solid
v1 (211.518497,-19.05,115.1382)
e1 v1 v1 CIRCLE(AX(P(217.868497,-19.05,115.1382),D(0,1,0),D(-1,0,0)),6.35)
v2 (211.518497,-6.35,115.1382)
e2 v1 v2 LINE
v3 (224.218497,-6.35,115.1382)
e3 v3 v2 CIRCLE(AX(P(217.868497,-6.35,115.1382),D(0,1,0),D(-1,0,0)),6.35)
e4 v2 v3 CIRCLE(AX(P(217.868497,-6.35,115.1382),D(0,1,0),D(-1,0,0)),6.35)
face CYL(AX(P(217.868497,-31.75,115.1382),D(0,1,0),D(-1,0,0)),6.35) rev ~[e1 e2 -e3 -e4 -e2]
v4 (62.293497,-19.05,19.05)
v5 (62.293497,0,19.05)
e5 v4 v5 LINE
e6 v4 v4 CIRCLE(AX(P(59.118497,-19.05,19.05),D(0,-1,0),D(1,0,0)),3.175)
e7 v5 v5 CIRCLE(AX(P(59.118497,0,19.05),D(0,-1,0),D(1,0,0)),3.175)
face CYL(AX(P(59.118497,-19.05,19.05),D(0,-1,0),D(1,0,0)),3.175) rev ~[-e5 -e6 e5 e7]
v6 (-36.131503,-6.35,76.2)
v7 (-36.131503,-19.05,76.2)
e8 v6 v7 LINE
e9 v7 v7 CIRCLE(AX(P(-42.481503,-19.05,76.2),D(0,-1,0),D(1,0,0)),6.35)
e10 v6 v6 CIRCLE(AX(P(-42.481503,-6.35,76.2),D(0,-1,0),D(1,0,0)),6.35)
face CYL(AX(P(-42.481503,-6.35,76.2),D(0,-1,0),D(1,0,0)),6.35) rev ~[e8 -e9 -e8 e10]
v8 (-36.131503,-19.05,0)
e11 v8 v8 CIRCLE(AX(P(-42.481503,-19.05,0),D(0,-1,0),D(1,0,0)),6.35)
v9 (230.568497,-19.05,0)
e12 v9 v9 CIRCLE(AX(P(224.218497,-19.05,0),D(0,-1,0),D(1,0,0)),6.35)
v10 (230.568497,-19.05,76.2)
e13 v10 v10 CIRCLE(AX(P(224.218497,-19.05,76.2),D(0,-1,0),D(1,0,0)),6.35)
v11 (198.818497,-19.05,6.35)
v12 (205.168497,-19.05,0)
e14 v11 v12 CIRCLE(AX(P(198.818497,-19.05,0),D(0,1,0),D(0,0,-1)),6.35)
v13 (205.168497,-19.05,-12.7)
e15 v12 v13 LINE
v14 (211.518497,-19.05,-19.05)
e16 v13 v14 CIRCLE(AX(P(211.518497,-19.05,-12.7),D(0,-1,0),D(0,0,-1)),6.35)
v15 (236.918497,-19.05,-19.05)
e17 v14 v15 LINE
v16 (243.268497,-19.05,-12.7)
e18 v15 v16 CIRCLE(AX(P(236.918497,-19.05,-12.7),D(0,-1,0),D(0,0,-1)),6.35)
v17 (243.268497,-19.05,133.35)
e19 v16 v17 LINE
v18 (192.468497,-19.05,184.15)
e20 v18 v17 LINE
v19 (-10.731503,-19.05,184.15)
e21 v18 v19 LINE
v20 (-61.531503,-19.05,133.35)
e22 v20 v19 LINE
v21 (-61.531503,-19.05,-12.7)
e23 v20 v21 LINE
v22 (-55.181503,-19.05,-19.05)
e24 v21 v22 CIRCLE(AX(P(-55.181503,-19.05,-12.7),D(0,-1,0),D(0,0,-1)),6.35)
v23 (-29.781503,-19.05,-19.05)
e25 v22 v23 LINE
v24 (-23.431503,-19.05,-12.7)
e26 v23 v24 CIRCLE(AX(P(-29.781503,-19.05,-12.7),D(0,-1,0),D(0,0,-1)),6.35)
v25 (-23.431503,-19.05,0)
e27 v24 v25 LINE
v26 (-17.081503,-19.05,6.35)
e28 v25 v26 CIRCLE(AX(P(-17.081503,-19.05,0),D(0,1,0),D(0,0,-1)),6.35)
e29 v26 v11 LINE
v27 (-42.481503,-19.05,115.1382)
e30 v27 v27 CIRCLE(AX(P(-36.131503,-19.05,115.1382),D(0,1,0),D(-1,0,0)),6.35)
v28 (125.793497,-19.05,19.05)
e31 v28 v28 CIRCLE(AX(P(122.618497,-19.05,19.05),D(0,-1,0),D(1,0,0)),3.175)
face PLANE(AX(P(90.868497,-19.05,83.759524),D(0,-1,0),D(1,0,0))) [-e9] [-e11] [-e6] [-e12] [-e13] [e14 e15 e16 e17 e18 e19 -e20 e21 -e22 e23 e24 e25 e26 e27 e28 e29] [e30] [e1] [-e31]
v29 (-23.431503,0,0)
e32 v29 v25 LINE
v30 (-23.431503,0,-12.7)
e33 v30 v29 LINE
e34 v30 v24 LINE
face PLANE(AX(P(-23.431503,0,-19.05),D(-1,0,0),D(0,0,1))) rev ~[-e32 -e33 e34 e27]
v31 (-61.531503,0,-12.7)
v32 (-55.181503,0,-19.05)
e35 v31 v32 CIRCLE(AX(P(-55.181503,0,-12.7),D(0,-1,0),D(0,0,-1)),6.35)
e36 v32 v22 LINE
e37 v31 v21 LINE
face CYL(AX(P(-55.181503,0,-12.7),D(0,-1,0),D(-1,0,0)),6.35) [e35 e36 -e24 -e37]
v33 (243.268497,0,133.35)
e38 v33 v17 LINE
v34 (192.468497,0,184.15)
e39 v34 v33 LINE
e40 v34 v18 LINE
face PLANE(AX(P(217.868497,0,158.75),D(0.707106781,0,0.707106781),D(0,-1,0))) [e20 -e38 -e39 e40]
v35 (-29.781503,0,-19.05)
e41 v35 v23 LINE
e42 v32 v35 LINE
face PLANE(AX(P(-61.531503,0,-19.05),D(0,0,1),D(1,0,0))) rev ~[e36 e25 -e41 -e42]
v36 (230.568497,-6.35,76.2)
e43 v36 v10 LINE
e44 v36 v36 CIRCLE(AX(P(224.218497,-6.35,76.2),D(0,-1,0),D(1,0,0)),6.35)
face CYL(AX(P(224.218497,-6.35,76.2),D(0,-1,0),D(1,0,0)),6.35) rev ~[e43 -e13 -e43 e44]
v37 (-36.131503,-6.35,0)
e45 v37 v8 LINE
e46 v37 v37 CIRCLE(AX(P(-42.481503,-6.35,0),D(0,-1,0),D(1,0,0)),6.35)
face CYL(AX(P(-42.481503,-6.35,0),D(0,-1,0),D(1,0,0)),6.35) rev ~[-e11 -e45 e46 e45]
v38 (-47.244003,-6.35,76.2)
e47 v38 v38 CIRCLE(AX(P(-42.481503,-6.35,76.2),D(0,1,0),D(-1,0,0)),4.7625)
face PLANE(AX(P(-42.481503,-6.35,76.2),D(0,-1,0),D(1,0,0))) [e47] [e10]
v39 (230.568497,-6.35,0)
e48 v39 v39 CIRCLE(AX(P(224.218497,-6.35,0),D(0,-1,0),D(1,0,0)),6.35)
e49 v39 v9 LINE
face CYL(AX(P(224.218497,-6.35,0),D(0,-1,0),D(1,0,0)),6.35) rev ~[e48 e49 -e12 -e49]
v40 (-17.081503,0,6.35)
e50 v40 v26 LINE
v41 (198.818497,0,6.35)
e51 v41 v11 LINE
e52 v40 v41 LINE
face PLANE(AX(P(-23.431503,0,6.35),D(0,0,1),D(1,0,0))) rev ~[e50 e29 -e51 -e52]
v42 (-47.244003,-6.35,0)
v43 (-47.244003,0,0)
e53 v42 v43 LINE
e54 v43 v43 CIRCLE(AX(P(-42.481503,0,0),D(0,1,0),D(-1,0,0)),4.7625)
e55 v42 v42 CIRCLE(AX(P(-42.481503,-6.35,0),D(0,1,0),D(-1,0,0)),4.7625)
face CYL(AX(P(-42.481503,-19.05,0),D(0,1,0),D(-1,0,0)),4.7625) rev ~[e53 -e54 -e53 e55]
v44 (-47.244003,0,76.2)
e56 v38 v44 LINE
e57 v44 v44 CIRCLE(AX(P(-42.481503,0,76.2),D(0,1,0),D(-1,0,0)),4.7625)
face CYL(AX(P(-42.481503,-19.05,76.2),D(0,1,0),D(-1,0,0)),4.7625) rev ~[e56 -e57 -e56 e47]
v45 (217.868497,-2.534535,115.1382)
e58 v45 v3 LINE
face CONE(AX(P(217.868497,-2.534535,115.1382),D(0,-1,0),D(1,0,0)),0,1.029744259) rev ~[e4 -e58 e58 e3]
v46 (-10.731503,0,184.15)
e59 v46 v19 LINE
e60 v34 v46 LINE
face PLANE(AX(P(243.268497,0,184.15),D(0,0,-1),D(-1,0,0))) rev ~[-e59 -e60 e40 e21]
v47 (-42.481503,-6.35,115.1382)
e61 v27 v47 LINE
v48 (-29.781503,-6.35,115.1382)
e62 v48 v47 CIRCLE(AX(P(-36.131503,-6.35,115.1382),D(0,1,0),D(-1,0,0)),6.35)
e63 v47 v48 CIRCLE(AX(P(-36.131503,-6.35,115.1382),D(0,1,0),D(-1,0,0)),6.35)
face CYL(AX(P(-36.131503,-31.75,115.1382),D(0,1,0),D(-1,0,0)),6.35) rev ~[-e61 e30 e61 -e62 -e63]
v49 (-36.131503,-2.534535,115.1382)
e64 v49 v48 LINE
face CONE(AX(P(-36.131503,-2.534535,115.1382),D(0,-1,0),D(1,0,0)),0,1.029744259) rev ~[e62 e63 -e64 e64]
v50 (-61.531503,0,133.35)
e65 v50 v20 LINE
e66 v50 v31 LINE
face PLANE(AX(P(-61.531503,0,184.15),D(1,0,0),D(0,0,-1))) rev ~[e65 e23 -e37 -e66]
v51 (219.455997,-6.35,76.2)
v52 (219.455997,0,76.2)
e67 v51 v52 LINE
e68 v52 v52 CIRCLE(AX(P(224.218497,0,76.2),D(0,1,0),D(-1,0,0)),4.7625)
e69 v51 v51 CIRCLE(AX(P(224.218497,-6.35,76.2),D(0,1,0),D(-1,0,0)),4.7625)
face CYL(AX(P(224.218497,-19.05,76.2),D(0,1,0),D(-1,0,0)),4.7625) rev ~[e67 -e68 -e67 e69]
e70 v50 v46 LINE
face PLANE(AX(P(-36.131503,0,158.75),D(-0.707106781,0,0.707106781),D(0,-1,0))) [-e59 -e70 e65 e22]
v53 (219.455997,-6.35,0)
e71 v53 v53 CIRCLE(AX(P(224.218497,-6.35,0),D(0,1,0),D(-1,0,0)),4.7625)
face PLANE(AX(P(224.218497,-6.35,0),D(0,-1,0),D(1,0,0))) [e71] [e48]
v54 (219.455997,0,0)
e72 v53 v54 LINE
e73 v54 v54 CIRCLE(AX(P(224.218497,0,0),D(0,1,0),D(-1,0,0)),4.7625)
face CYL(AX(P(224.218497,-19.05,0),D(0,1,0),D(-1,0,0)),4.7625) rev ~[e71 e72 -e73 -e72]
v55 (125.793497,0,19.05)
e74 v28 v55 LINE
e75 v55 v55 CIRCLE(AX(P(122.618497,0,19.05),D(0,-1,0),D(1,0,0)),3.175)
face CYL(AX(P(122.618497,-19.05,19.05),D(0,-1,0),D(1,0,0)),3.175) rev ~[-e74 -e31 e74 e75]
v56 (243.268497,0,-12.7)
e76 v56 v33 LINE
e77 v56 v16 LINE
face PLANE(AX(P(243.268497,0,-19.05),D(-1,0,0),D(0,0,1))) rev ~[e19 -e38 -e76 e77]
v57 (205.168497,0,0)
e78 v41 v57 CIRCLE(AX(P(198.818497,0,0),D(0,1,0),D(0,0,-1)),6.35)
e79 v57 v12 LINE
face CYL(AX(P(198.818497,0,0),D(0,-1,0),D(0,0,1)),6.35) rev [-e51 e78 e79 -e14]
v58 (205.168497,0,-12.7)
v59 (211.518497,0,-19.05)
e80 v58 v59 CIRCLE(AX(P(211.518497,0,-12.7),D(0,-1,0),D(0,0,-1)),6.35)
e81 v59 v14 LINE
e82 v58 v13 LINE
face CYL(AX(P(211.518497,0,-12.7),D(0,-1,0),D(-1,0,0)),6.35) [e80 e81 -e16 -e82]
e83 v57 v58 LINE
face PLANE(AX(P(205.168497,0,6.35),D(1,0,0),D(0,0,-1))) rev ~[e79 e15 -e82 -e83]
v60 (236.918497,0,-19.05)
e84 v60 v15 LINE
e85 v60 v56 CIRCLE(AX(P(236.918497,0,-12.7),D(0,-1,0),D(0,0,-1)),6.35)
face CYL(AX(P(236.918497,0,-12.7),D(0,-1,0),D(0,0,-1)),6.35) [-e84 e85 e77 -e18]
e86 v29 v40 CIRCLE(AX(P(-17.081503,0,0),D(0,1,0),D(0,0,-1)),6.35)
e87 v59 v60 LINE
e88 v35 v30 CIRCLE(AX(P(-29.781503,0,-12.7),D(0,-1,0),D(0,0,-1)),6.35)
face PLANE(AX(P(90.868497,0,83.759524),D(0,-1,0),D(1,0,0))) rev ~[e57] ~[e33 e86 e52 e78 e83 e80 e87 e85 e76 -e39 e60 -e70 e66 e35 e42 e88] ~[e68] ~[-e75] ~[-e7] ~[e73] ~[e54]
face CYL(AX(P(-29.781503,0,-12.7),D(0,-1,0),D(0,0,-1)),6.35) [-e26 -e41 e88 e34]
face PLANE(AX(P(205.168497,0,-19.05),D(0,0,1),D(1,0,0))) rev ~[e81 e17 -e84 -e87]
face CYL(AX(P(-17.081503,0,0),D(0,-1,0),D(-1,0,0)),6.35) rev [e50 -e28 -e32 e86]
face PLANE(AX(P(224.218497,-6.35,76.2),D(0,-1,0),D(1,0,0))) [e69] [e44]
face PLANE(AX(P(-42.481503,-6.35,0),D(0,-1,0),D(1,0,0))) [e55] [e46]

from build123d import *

# Parameters (mm, degrees)
F1_DEPTH       = 19.05
F2_R           = 6.35
F3_SIZE2       = 50.8
F3_SIZE        = 50.8
F4_R           = 3.175
F5_DEPTH       = 25.4
F6_D           = 12.7
F6_DEPTH       = 12.7
F6_TIP         = 3.8154649308
F7_D           = 9.525
F7_DEPTH       = 25.4
F7_CBORE_D     = 12.7
F7_CBORE_DEPTH = 12.7
F7_TIP         = 2.8615986981


# Not quite as in the source:
# - a feature names something its author has since deleted; it is built from what else it names


with BuildPart() as f1:
    # F0 (on Front) → F1 (new body)
    with BuildSketch(Plane.XZ):
        Polygon((-61.5315027535, 184.1499997646), (-61.5315027535, -19.0500002354), (-23.4315027535, -19.0500002354), (-23.4315027535, 6.3499997646), (205.1684972465, 6.3499997646), (205.1684972465, -19.0500002354), (243.2684972465, -19.0500002354), (243.2684972465, 184.1499997646), align=None)
    extrude(amount=F1_DEPTH)

    # F2
    f2_edges = [f1.edges().sort_by_distance(p)[0] for p in [
        (-23.431503, -9.525, 6.35),
        (-61.531503, -9.525, -19.05),
        (243.268497, -9.525, -19.05),
        (205.168497, -9.525, -19.05),
        (205.168497, -9.525, 6.35),
        (-23.431503, -9.525, -19.05),
    ]]
    fillet(f2_edges, radius=F2_R)

    # F3
    f3_edges = [f1.edges().sort_by_distance(p)[0] for p in [
        (243.268497, -9.525, 184.15),
        (-61.531503, -9.525, 184.15),
    ]]
    chamfer(f3_edges, length=F3_SIZE, length2=F3_SIZE2)

    # F4 (on face) → F5 (cut)
    with BuildSketch(Plane.XZ.offset(19.05)):
        with Locations((59.1184972465, 19.0499997646)):
            Circle(F4_R)
        with Locations((122.6184972465, 19.0499997646)):
            Circle(F4_R)
    extrude(amount=-F5_DEPTH, mode=Mode.SUBTRACT)

    # F6
    with Locations(Plane.XZ.offset(19.05)):
        with Locations((-36.1315027535, 115.1381997646), (217.8684972465, 115.1381997646)):
            Hole(F6_D / 2, depth=F6_DEPTH)
            with Locations((0, 0, -(F6_DEPTH + F6_TIP / 2))):  # 118° drill point
                Cone(0, F6_D / 2, F6_TIP, mode=Mode.SUBTRACT)

    # F7
    with Locations(Plane.XZ.offset(19.05)):
        with Locations((-42.4815027535, 76.1999997646), (-42.4815027535, -2.354e-07), (224.2184972465, -2.354e-07), (224.2184972465, 76.1999997646)):
            CounterBoreHole(F7_D / 2, F7_CBORE_D / 2, F7_CBORE_DEPTH, depth=F7_DEPTH)
            with Locations((0, 0, -(F7_DEPTH + F7_TIP / 2))):  # 118° drill point
                Cone(0, F7_D / 2, F7_TIP, mode=Mode.SUBTRACT)


solid = f1.part
